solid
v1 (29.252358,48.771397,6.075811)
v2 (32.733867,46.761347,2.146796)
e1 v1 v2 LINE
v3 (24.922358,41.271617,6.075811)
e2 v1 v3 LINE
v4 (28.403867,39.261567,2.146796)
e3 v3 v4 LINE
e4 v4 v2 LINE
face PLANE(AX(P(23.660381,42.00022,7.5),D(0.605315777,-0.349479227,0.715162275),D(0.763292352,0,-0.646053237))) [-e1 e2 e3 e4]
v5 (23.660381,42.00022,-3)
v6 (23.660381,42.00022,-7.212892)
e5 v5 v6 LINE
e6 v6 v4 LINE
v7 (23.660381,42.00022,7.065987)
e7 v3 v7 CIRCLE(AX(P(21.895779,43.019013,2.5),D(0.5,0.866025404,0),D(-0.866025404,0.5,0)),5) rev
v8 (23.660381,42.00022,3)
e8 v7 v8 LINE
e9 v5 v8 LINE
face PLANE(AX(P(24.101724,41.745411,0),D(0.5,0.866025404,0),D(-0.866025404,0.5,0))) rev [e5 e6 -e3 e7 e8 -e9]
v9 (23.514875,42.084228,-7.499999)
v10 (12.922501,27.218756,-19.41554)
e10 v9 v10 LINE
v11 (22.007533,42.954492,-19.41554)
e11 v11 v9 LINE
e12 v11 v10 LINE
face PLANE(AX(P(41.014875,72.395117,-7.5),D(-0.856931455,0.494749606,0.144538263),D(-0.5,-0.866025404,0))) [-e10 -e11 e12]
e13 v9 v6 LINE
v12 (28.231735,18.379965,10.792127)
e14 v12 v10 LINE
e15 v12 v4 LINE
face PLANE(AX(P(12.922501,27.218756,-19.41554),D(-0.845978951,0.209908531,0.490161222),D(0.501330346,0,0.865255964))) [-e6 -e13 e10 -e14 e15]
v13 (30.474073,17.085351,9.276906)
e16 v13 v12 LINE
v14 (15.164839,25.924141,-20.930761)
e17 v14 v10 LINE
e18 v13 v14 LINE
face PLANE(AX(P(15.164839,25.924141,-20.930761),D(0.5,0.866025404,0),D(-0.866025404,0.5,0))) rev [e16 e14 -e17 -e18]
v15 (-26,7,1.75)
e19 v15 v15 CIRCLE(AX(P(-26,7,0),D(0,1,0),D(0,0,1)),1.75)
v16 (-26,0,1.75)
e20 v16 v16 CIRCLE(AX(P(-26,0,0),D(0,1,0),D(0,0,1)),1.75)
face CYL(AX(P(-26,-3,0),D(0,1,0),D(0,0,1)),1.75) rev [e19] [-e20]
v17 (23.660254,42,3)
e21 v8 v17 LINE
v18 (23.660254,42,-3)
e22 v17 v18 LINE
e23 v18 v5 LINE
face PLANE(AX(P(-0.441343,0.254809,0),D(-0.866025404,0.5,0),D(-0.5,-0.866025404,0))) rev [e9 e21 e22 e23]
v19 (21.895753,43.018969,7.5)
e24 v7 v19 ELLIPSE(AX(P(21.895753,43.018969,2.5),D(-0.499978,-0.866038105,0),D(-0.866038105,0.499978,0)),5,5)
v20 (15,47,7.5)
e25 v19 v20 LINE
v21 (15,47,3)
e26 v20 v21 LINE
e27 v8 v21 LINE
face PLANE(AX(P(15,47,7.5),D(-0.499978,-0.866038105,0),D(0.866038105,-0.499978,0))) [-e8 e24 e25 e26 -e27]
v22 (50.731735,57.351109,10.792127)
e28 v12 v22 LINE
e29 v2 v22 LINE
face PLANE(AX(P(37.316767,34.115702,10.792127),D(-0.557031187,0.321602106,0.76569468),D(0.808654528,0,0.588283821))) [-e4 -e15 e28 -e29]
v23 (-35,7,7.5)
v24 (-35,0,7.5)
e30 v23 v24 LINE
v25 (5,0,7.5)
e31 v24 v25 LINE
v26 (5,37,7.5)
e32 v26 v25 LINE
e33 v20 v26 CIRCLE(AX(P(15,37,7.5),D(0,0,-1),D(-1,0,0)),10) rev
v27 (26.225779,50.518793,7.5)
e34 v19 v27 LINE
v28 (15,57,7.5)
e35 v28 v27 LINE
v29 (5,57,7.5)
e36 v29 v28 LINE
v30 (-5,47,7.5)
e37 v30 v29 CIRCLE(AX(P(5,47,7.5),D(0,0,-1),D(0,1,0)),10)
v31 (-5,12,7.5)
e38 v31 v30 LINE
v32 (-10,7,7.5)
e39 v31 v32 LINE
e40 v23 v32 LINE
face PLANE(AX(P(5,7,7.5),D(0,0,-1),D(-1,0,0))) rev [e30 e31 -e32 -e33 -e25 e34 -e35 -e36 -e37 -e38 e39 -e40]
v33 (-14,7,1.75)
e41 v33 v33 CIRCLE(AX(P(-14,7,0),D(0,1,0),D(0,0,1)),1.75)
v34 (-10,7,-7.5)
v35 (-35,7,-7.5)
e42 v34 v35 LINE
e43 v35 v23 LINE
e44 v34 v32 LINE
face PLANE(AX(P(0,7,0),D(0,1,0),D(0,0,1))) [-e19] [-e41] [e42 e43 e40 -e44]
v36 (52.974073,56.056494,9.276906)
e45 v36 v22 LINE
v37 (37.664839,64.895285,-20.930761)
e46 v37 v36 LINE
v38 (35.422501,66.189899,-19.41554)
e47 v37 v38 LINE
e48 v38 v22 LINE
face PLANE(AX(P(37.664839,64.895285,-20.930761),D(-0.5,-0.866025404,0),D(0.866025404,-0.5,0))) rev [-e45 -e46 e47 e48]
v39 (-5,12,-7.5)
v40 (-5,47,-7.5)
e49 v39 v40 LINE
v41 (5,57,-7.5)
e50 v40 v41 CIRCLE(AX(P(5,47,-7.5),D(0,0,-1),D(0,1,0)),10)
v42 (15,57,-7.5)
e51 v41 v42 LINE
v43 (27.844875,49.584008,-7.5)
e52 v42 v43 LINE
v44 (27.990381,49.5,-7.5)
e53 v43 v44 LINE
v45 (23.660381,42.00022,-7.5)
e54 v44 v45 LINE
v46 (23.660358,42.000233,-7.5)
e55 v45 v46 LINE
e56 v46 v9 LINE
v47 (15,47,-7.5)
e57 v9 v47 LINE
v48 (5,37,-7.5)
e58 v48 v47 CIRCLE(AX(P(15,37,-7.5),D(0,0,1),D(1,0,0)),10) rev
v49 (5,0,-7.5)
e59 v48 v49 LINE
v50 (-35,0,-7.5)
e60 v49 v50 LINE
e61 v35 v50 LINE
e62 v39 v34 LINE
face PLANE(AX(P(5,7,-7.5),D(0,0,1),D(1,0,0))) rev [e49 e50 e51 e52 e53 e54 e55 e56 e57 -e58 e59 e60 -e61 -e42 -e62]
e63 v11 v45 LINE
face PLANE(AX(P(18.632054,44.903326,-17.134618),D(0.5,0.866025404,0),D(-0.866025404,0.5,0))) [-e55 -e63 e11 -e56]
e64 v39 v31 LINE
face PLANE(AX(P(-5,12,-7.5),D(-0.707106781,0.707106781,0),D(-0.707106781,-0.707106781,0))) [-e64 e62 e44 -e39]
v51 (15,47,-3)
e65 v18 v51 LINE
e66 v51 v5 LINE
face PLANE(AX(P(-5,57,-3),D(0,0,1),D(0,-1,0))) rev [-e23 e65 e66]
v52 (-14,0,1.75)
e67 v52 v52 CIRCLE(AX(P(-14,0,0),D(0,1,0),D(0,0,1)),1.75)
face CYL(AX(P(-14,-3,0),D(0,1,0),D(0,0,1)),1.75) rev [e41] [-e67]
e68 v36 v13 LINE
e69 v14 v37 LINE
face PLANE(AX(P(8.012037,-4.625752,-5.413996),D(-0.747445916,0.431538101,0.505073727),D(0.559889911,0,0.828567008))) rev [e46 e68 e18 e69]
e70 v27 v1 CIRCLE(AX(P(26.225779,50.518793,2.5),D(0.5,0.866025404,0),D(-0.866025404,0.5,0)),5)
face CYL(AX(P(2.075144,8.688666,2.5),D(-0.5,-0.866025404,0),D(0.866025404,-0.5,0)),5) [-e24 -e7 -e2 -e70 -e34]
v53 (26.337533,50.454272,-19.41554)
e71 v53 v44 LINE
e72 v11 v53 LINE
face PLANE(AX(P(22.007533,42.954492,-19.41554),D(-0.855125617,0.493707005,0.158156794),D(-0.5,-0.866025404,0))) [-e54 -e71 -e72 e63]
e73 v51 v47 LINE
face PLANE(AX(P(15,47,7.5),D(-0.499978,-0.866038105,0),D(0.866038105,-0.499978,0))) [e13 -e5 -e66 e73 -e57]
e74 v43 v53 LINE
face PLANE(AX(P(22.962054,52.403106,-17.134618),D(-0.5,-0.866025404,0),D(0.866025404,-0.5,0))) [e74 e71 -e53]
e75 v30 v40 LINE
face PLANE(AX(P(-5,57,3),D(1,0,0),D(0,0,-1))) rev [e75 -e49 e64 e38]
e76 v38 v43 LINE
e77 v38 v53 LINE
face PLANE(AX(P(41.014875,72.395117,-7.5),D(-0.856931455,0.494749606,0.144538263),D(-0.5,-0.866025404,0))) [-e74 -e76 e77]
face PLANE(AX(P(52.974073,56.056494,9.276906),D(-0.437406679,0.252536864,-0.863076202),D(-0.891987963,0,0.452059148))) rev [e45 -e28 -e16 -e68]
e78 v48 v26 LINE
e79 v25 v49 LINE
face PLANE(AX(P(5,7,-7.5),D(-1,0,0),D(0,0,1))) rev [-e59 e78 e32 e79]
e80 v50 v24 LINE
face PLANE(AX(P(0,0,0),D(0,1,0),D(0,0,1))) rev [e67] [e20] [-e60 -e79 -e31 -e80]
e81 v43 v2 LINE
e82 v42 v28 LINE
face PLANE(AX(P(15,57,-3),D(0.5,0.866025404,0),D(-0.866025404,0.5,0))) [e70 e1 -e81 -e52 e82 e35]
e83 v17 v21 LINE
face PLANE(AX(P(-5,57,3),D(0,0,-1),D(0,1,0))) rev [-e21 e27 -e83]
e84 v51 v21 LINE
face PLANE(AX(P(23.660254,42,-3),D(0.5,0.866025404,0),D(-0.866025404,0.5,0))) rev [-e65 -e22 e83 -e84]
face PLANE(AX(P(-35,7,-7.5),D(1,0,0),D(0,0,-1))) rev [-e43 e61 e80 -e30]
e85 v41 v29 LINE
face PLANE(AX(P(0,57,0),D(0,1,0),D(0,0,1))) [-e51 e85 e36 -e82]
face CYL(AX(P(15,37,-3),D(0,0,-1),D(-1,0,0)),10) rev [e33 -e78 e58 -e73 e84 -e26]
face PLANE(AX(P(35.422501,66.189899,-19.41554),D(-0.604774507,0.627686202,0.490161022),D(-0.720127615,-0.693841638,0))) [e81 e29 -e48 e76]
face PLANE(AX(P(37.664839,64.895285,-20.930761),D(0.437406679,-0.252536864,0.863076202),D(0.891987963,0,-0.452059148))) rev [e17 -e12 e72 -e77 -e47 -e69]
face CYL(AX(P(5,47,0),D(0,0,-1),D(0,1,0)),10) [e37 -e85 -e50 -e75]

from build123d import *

# Parameters (mm, degrees)
SKETCH_1_W               = 40
SKETCH_1_H               = 15
EXTRUDE_1_DEPTH          = 7
SKETCH_3_W               = 10
SKETCH_3_H               = 6
EXTRUDE_2_DEPTH          = 50
EXTRUDE_5_DEPTH          = 6
FILLET_1_R               = 10
SKETCH_7_R               = 1.75
CUT_EXTRUDE_3_DEPTH      = 10
SKETCH_16_W              = 6
SKETCH_16_H              = 8.660254038
EXTRUDE_11_DEPTH         = 10
EXTRUDE_12_DEPTH         = 8.66
EXTRUDE_14_DEPTH         = 3
EXTRUDE_15_DEPTH         = 4.5
EXTRUDE_15_DEPTH_BACK    = 10.5
EXTRUDE_17_DEPTH         = 8.66
EXTRUDE_22_DEPTH         = 8.66
EXTRUDE_23_DEPTH         = 15
FILLET_2_R               = 10
EXTRUDE_24_DEPTH         = 35
CUT_EXTRUDE_4_DEPTH      = 35
CUT_EXTRUDE_4_DEPTH_BACK = 35
CUT_EXTRUDE_5_DEPTH      = 35
CUT_EXTRUDE_5_DEPTH_BACK = 35
FILLET_3_R               = 5


with BuildPart() as part:
    # 草图1 → 凸台-拉伸1 (new body)
    with BuildSketch(Plane(origin=(0, 0, 0), x_dir=(1, 0, 0), z_dir=(0, 1, 0))):
        with Locations((-15, 0)):
            Rectangle(SKETCH_1_W, SKETCH_1_H)
    extrude(amount=EXTRUDE_1_DEPTH)

    # 草图3 → 凸台-拉伸2 (add)
    with BuildSketch(Plane(origin=(0, 7, 0), x_dir=(1, 0, 0), z_dir=(0, 1, 0))):
        Rectangle(SKETCH_3_W, SKETCH_3_H)
    extrude(amount=EXTRUDE_2_DEPTH)

    # 草图4 → 凸台-拉伸5 (add)
    with BuildSketch(Plane.XY.offset(3)):
        Polygon((5, 57), (5, 47), (15, 47), (19.330127019, 54.5), (15, 57), align=None)
    extrude(amount=-EXTRUDE_5_DEPTH)

    # 圆角1
    fillet_1_edges = [part.edges().sort_by_distance(p)[0] for p in [
        (-5, 57, 0),
    ]]
    fillet(fillet_1_edges, radius=FILLET_1_R)

    # 草图7 → 切除-拉伸3 (cut)
    with BuildSketch(Plane(origin=(0, 7, 0), x_dir=(1, 0, 0), z_dir=(0, 1, 0))):
        with Locations(Location((-26, 0, 0), (0, 0, 270))):
            Circle(SKETCH_7_R)
        with Locations(Location((-14, 0, 0), (0, 0, 270))):
            Circle(SKETCH_7_R)
    extrude(amount=-CUT_EXTRUDE_3_DEPTH, mode=Mode.SUBTRACT)

    # 草图16 → 凸台-拉伸11 (add)
    with BuildSketch(Plane(origin=(-9.101596989, 5.254809472, 0), x_dir=(0, 0, -1), z_dir=(0.8660254037844403, -0.4999999999999973, 0))):
        with Locations((0, 52.533320997)):
            Rectangle(SKETCH_16_W, SKETCH_16_H)
    extrude(amount=EXTRUDE_11_DEPTH)

    # 草图17 → 凸台-拉伸12 (add)
    with BuildSketch(Plane(origin=(28.431724008, 49.245190528, 0), x_dir=(0.8660254037844402, -0.4999999999999975, 0), z_dir=(0.4999999999999975, 0.8660254037844402, 0))):
        Polygon((-0.509618943, -3), (6.561448869, 4.071067812), (4.387416664, 7.7860808), (-0.509618943, 3), align=None)
    extrude(amount=-EXTRUDE_12_DEPTH)

    # 草图19 → 凸台-拉伸14 (add)
    with BuildSketch(Plane(origin=(5.769699285, -3.331137436, -3.898775098), x_dir=(-0.6556667796433489, -0.35687658637483116, -0.6653872377567577), z_dir=(0.7474459160042376, -0.43153810080973004, -0.5050737274875003))):
        Polygon((-33.928130068, 69.297295246), (-5.267738986, 34.604616147), (-32.250933841, 12.313200861), (-60.911324922, 47.00587996), align=None)
    extrude(amount=EXTRUDE_14_DEPTH)

    # 草图20 → 凸台-拉伸15 (add, two sides: drawn at the far end of the back side and taken through both)
    with BuildSketch(Plane(origin=(0, 0, -3), x_dir=(-1, 0, 0), z_dir=(0, 0, -1)).offset(-EXTRUDE_15_DEPTH_BACK)):
        with BuildLine():
            Line((-5, 7), (5, 7))
            Line((5, 7), (5, 47))
            ThreePointArc((5, 47), (2.071067812, 54.071067812), (-5, 57))
            Line((-5, 57), (-15, 57))
            Line((-15, 57), (-27.990381057, 49.5))
            Line((-27.990381057, 49.5), (-23.660381057, 42.000220003))
            Line((-23.660381057, 42.000220003), (-15, 47))
            Line((-15, 47), (-5, 47))
            Line((-5, 47), (-5, 7))
        make_face()
    extrude(amount=EXTRUDE_15_DEPTH + EXTRUDE_15_DEPTH_BACK)

    # 草图21 → 凸台-拉伸17 (add)
    with BuildSketch(Plane(origin=(28.431724008, 49.245190528, 0), x_dir=(0.8660254037844402, -0.4999999999999975, 0), z_dir=(0.4999999999999975, 0.8660254037844402, 0))):
        Polygon((-0.509618943, 7.5), (-0.509618943, 3), (4.387416664, 7.7860808), align=None)
        Polygon((-0.509618943, -7.5), (8.29635004, 1.106447339), (6.561448869, 4.071067812), (-0.509618943, -3), align=None)
    extrude(amount=-EXTRUDE_17_DEPTH)

    # 草图22 → 凸台-拉伸22 (add)
    with BuildSketch(Plane(origin=(28.431724008, 49.245190528, 0), x_dir=(0.8660254037844402, -0.4999999999999975, 0), z_dir=(0.4999999999999975, 0.8660254037844402, 0))):
        Polygon((4.387416664, 7.7860808), (-2.41816344, 19.41553984), (-0.509618943, 7.5), align=None)
        Polygon((8.29635004, 1.106447339), (15.259417022, -10.792127217), (4.967687183, -2.146796188), align=None)
    extrude(amount=-EXTRUDE_22_DEPTH)

    # 草图23 → 凸台-拉伸23 (add)
    with BuildSketch(Plane.XY.offset(7.5)):
        Polygon((-5, 7), (-10, 7), (-5, 12), align=None)
    extrude(amount=-EXTRUDE_23_DEPTH)

    # 圆角2
    fillet_2_edges = [part.edges().sort_by_distance(p)[0] for p in [
        (5, 47, 0),
    ]]
    fillet(fillet_2_edges, radius=FILLET_2_R - 0.0001)  # a hair under: the kernel refuses the full size


with BuildPart() as extrude_24_tool:
    # 草图24 → 凸台-拉伸24 (new body)
    with BuildSketch(Plane(origin=(7.445343505, -4.298571076, 14.690902319), x_dir=(0.8992638085264243, 0.12283526789294275, -0.4198048351748937), z_dir=(0.43740667881795164, -0.25253686369234724, 0.8630762016194644))):
        Polygon((34.27908934, 45.482482988), (38.032691816, 42.971530425), (48.135364869, 58.073933853), align=None)
        Polygon((29.464039564, 38.284504407), (33.21764204, 35.773551844), (23.114898365, 20.671042842), align=None)
    extrude(amount=-EXTRUDE_24_DEPTH)


with BuildPart() as part_1:
    add(part.part)


with BuildPart() as part_2:
    # 凸台-拉伸24: joined with extrude_24_tool
    add(part_1.part.fuse(extrude_24_tool.part, tol=0.00001))

    # 草图25 → 切除-拉伸4 (cut, two sides: drawn at the far end of the back side and taken through both)
    with BuildSketch(Plane(origin=(28.431724014, 49.245190525, -8e-09), x_dir=(0.866025403727626, -0.5000000000984025, 7.809544934800217e-11), z_dir=(-0.5000000000984025, -0.866025403727626, 1.35265286075167e-10)).offset(-CUT_EXTRUDE_4_DEPTH_BACK)):
        Polygon((11.361749763, 13.073049031), (15.259417021, 10.792127222), (4.967687177, 2.146796194), align=None)
    extrude(amount=CUT_EXTRUDE_4_DEPTH + CUT_EXTRUDE_4_DEPTH_BACK, mode=Mode.SUBTRACT)

    # 草图26 → 切除-拉伸5 (cut, two sides: drawn at the far end of the back side and taken through both)
    with BuildSketch(Plane(origin=(24.101724013, 41.745410529, -7e-09), x_dir=(0.8660254037276265, -0.5000000000984015, 7.809507734629167e-11), z_dir=(0.5000000000984015, 0.8660254037276265, -1.3526464174930455e-10)).offset(-CUT_EXTRUDE_5_DEPTH_BACK)):
        Polygon((-0.677635102, 7.499999992), (-2.41816345, 19.415539829), (-6.315830703, 17.134618023), align=None)
    extrude(amount=CUT_EXTRUDE_5_DEPTH + CUT_EXTRUDE_5_DEPTH_BACK, mode=Mode.SUBTRACT)

    # 圆角3
    fillet_3_edges = [part_2.edges().sort_by_distance(p)[0] for p in [
        (25.825381057, 45.750110002, 7.5),
    ]]
    fillet(fillet_3_edges, radius=FILLET_3_R)


solid = part_2.part
